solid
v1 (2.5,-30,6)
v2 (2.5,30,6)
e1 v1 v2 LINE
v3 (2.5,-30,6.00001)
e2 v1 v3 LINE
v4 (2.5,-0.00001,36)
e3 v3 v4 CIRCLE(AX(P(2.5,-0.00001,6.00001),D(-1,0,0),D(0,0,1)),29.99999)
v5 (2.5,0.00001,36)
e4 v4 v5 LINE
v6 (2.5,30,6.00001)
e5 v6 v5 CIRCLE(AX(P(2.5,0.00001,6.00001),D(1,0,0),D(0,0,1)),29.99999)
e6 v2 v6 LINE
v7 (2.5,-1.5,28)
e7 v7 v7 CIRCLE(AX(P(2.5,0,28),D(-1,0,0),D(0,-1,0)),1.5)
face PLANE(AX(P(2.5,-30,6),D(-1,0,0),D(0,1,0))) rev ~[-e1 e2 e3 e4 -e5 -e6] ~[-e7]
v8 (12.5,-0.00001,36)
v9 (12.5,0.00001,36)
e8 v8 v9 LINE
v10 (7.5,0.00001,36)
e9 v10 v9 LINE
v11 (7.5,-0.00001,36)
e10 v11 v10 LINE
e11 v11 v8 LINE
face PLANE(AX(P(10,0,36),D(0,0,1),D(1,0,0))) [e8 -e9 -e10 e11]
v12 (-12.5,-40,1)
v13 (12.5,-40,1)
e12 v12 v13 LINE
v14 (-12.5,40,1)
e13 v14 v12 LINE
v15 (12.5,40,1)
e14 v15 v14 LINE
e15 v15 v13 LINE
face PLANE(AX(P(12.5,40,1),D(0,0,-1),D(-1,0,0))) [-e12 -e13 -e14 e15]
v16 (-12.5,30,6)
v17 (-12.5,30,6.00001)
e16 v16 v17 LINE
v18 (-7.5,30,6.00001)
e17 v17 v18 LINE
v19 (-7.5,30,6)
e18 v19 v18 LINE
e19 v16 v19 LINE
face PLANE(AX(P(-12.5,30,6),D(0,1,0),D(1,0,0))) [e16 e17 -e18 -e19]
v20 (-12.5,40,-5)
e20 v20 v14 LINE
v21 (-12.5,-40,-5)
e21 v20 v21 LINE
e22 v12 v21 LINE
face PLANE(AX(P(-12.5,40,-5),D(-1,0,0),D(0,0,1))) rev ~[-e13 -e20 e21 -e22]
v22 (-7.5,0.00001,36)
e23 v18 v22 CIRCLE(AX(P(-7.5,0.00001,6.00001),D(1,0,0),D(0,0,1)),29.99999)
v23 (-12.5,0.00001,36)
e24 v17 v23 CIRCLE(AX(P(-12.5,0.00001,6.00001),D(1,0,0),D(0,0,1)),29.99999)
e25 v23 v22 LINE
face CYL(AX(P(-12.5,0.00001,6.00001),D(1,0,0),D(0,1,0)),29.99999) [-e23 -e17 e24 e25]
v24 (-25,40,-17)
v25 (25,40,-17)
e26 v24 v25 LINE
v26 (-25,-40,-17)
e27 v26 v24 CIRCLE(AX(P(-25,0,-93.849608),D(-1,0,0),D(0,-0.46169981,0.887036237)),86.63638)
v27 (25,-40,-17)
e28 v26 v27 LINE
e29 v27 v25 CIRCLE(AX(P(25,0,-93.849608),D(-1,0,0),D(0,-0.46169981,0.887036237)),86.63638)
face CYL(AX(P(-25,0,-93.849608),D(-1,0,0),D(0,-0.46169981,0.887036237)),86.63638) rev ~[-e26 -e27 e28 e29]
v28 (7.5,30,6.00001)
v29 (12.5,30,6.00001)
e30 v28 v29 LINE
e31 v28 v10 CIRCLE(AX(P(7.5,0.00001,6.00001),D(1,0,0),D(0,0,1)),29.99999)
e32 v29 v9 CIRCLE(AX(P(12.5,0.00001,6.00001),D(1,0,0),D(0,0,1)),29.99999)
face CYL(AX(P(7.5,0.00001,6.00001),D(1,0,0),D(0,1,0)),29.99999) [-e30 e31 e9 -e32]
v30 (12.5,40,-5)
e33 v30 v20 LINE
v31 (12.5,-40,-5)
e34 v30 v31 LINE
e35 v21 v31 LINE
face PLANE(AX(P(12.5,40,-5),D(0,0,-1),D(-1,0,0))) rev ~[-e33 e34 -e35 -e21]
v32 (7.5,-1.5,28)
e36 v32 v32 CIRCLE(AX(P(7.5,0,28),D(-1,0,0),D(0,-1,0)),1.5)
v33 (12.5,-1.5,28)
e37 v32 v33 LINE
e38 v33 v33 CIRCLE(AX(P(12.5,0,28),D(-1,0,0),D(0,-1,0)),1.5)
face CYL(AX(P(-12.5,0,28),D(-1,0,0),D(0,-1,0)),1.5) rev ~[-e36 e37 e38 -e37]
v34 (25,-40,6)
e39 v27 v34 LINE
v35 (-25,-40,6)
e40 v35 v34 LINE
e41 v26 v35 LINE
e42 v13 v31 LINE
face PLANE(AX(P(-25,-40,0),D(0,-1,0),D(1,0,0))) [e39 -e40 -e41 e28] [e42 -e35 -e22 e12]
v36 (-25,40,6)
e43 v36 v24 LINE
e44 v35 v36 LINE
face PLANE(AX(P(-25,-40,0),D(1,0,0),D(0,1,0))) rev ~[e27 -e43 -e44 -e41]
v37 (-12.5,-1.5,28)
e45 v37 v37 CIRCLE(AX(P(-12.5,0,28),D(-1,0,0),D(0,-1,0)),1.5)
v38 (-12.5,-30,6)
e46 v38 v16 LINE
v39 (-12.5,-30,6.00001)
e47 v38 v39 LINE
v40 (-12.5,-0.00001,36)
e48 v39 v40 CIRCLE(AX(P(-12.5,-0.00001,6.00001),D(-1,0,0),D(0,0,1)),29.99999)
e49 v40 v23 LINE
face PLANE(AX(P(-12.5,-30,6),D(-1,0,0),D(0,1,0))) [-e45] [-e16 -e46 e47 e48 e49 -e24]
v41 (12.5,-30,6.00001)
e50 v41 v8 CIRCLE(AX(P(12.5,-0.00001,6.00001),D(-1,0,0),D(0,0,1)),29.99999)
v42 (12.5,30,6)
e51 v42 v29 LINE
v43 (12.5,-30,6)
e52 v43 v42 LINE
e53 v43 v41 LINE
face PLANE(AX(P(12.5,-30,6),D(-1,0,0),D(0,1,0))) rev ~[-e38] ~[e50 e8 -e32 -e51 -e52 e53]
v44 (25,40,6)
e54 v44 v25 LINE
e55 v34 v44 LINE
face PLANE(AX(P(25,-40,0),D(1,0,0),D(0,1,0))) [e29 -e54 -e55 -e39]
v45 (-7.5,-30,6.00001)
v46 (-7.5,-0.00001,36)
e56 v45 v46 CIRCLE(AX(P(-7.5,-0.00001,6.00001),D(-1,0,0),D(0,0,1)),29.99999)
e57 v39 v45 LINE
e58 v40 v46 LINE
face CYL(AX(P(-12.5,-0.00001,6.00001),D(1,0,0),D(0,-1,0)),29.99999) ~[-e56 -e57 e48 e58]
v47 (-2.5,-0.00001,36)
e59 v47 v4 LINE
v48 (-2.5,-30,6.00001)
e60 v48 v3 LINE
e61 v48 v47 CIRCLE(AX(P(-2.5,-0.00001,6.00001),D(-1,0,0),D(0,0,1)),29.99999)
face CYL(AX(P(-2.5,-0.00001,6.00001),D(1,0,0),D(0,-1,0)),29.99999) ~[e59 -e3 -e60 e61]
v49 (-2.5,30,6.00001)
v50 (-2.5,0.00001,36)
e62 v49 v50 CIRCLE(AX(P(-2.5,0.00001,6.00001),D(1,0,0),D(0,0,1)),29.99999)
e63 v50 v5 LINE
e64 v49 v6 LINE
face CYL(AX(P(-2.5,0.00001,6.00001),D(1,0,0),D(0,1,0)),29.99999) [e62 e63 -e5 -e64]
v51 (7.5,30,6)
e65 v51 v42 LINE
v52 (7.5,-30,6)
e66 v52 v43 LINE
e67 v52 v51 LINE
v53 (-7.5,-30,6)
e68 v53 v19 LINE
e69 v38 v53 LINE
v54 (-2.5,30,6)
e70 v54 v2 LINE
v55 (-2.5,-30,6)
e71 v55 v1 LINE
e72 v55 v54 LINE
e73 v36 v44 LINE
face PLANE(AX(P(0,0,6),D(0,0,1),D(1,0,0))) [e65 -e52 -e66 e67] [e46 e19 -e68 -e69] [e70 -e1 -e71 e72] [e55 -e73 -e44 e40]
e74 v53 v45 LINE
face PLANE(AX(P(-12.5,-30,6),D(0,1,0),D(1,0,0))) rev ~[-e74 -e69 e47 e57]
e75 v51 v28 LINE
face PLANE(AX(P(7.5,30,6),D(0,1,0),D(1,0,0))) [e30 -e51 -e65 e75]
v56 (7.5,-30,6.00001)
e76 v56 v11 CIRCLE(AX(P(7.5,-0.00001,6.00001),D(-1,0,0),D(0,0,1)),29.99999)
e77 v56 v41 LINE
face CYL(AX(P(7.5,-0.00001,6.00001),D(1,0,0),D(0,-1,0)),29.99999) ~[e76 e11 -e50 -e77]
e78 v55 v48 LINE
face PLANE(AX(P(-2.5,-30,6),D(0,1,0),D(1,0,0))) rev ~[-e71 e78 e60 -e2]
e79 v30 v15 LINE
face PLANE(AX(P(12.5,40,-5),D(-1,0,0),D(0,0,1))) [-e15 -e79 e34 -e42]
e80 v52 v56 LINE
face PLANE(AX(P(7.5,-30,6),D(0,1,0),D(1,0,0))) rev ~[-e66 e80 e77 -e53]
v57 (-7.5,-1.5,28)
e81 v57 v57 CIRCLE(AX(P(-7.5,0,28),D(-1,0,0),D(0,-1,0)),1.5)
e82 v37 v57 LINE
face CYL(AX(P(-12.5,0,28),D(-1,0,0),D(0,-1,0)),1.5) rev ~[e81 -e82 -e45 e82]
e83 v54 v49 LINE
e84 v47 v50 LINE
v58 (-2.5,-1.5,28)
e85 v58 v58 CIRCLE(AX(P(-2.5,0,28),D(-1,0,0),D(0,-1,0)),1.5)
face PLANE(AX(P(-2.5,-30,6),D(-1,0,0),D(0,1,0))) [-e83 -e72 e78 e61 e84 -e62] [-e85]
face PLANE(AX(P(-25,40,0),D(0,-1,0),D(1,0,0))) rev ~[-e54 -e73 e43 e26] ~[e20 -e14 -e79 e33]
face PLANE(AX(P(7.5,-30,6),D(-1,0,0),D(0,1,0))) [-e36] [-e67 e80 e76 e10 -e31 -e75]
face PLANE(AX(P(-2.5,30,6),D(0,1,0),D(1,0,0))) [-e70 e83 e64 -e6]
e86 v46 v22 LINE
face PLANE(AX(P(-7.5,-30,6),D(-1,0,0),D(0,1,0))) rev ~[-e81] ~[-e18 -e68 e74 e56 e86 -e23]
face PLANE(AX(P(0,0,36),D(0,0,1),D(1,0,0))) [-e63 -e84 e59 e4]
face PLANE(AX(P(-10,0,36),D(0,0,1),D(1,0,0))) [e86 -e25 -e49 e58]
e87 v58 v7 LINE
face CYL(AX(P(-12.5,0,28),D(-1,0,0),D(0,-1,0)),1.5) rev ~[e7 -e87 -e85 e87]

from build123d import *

# Parameters (mm, degrees)
F0_W      = 50
F0_H      = 80
F1_DEPTH  = 6
F2_W      = 5
F2_H      = 60
F3_DEPTH  = 30
F4_R      = 29.99999
F5_DEPTH  = 40
F7_DEPTH  = 65
F8_W      = 25
F8_H      = 6
F9_DEPTH  = 115.9
F10_R     = 1.5
F11_DEPTH = 30.7


# Not quite as in the source:
# - a fillet or chamfer is up to 0.001 mm smaller than in the source, because OpenCascade refuses the exact size


with BuildPart() as f1:
    # F0 (on Top) → F1 (new body)
    with BuildSketch(Plane.XY):
        Rectangle(F0_W, F0_H)
    extrude(amount=F1_DEPTH)

    # F2 (on face) → F3 (join)
    with BuildSketch(Plane.XY.offset(6)):
        Rectangle(F2_W, F2_H)
        with Locations((-10, 0)):
            Rectangle(F2_W, F2_H)
        with Locations((10, 0)):
            Rectangle(F2_W, F2_H)
    extrude(amount=F3_DEPTH)

    # F4 (radius 30 in the source; OpenCascade refuses exactly that, so slightly less here)
    f4_edges = [f1.edges().sort_by_distance(p)[0] for p in [
        (10, 30, 36),
        (0, 30, 36),
        (-10, 30, 36),
        (-10, -30, 36),
        (0, -30, 36),
        (10, -30, 36),
    ]]
    fillet(f4_edges, radius=F4_R)

    # F5 (add): a face of the model
    f5_faces = [f1.faces().sort_by_distance(p)[0] for p in [
        (0, 0, 0),
    ]]
    extrude(f5_faces, amount=F5_DEPTH)

    # F6 (on face) → F7 (cut)
    with BuildSketch(Plane(origin=(-25, 0, 0), x_dir=(0, -1, 0), z_dir=(-1, 0, 0))):
        with BuildLine():
            Line((40, -40), (40, -17))
            ThreePointArc((40, -17), (0, -7.2132285382), (-40, -17))
            Line((-40, -17), (-40, -40))
            Line((-40, -40), (40, -40))
        make_face()
    extrude(amount=-F7_DEPTH, mode=Mode.SUBTRACT)

    # F8 (on face) → F9 (cut)
    with BuildSketch(Plane(origin=(0, 40, 0), x_dir=(-1, 0, 0), z_dir=(0, 1, 0))):
        with Locations((0, -2)):
            Rectangle(F8_W, F8_H)
    extrude(amount=-F9_DEPTH, mode=Mode.SUBTRACT)

    # F10 (on face) → F11 (cut)
    with BuildSketch(Plane(origin=(-12.5, 0, 0), x_dir=(0, -1, 0), z_dir=(-1, 0, 0))):
        with Locations((0, 28)):
            Circle(F10_R)
    extrude(amount=-F11_DEPTH, mode=Mode.SUBTRACT)


solid = f1.part
